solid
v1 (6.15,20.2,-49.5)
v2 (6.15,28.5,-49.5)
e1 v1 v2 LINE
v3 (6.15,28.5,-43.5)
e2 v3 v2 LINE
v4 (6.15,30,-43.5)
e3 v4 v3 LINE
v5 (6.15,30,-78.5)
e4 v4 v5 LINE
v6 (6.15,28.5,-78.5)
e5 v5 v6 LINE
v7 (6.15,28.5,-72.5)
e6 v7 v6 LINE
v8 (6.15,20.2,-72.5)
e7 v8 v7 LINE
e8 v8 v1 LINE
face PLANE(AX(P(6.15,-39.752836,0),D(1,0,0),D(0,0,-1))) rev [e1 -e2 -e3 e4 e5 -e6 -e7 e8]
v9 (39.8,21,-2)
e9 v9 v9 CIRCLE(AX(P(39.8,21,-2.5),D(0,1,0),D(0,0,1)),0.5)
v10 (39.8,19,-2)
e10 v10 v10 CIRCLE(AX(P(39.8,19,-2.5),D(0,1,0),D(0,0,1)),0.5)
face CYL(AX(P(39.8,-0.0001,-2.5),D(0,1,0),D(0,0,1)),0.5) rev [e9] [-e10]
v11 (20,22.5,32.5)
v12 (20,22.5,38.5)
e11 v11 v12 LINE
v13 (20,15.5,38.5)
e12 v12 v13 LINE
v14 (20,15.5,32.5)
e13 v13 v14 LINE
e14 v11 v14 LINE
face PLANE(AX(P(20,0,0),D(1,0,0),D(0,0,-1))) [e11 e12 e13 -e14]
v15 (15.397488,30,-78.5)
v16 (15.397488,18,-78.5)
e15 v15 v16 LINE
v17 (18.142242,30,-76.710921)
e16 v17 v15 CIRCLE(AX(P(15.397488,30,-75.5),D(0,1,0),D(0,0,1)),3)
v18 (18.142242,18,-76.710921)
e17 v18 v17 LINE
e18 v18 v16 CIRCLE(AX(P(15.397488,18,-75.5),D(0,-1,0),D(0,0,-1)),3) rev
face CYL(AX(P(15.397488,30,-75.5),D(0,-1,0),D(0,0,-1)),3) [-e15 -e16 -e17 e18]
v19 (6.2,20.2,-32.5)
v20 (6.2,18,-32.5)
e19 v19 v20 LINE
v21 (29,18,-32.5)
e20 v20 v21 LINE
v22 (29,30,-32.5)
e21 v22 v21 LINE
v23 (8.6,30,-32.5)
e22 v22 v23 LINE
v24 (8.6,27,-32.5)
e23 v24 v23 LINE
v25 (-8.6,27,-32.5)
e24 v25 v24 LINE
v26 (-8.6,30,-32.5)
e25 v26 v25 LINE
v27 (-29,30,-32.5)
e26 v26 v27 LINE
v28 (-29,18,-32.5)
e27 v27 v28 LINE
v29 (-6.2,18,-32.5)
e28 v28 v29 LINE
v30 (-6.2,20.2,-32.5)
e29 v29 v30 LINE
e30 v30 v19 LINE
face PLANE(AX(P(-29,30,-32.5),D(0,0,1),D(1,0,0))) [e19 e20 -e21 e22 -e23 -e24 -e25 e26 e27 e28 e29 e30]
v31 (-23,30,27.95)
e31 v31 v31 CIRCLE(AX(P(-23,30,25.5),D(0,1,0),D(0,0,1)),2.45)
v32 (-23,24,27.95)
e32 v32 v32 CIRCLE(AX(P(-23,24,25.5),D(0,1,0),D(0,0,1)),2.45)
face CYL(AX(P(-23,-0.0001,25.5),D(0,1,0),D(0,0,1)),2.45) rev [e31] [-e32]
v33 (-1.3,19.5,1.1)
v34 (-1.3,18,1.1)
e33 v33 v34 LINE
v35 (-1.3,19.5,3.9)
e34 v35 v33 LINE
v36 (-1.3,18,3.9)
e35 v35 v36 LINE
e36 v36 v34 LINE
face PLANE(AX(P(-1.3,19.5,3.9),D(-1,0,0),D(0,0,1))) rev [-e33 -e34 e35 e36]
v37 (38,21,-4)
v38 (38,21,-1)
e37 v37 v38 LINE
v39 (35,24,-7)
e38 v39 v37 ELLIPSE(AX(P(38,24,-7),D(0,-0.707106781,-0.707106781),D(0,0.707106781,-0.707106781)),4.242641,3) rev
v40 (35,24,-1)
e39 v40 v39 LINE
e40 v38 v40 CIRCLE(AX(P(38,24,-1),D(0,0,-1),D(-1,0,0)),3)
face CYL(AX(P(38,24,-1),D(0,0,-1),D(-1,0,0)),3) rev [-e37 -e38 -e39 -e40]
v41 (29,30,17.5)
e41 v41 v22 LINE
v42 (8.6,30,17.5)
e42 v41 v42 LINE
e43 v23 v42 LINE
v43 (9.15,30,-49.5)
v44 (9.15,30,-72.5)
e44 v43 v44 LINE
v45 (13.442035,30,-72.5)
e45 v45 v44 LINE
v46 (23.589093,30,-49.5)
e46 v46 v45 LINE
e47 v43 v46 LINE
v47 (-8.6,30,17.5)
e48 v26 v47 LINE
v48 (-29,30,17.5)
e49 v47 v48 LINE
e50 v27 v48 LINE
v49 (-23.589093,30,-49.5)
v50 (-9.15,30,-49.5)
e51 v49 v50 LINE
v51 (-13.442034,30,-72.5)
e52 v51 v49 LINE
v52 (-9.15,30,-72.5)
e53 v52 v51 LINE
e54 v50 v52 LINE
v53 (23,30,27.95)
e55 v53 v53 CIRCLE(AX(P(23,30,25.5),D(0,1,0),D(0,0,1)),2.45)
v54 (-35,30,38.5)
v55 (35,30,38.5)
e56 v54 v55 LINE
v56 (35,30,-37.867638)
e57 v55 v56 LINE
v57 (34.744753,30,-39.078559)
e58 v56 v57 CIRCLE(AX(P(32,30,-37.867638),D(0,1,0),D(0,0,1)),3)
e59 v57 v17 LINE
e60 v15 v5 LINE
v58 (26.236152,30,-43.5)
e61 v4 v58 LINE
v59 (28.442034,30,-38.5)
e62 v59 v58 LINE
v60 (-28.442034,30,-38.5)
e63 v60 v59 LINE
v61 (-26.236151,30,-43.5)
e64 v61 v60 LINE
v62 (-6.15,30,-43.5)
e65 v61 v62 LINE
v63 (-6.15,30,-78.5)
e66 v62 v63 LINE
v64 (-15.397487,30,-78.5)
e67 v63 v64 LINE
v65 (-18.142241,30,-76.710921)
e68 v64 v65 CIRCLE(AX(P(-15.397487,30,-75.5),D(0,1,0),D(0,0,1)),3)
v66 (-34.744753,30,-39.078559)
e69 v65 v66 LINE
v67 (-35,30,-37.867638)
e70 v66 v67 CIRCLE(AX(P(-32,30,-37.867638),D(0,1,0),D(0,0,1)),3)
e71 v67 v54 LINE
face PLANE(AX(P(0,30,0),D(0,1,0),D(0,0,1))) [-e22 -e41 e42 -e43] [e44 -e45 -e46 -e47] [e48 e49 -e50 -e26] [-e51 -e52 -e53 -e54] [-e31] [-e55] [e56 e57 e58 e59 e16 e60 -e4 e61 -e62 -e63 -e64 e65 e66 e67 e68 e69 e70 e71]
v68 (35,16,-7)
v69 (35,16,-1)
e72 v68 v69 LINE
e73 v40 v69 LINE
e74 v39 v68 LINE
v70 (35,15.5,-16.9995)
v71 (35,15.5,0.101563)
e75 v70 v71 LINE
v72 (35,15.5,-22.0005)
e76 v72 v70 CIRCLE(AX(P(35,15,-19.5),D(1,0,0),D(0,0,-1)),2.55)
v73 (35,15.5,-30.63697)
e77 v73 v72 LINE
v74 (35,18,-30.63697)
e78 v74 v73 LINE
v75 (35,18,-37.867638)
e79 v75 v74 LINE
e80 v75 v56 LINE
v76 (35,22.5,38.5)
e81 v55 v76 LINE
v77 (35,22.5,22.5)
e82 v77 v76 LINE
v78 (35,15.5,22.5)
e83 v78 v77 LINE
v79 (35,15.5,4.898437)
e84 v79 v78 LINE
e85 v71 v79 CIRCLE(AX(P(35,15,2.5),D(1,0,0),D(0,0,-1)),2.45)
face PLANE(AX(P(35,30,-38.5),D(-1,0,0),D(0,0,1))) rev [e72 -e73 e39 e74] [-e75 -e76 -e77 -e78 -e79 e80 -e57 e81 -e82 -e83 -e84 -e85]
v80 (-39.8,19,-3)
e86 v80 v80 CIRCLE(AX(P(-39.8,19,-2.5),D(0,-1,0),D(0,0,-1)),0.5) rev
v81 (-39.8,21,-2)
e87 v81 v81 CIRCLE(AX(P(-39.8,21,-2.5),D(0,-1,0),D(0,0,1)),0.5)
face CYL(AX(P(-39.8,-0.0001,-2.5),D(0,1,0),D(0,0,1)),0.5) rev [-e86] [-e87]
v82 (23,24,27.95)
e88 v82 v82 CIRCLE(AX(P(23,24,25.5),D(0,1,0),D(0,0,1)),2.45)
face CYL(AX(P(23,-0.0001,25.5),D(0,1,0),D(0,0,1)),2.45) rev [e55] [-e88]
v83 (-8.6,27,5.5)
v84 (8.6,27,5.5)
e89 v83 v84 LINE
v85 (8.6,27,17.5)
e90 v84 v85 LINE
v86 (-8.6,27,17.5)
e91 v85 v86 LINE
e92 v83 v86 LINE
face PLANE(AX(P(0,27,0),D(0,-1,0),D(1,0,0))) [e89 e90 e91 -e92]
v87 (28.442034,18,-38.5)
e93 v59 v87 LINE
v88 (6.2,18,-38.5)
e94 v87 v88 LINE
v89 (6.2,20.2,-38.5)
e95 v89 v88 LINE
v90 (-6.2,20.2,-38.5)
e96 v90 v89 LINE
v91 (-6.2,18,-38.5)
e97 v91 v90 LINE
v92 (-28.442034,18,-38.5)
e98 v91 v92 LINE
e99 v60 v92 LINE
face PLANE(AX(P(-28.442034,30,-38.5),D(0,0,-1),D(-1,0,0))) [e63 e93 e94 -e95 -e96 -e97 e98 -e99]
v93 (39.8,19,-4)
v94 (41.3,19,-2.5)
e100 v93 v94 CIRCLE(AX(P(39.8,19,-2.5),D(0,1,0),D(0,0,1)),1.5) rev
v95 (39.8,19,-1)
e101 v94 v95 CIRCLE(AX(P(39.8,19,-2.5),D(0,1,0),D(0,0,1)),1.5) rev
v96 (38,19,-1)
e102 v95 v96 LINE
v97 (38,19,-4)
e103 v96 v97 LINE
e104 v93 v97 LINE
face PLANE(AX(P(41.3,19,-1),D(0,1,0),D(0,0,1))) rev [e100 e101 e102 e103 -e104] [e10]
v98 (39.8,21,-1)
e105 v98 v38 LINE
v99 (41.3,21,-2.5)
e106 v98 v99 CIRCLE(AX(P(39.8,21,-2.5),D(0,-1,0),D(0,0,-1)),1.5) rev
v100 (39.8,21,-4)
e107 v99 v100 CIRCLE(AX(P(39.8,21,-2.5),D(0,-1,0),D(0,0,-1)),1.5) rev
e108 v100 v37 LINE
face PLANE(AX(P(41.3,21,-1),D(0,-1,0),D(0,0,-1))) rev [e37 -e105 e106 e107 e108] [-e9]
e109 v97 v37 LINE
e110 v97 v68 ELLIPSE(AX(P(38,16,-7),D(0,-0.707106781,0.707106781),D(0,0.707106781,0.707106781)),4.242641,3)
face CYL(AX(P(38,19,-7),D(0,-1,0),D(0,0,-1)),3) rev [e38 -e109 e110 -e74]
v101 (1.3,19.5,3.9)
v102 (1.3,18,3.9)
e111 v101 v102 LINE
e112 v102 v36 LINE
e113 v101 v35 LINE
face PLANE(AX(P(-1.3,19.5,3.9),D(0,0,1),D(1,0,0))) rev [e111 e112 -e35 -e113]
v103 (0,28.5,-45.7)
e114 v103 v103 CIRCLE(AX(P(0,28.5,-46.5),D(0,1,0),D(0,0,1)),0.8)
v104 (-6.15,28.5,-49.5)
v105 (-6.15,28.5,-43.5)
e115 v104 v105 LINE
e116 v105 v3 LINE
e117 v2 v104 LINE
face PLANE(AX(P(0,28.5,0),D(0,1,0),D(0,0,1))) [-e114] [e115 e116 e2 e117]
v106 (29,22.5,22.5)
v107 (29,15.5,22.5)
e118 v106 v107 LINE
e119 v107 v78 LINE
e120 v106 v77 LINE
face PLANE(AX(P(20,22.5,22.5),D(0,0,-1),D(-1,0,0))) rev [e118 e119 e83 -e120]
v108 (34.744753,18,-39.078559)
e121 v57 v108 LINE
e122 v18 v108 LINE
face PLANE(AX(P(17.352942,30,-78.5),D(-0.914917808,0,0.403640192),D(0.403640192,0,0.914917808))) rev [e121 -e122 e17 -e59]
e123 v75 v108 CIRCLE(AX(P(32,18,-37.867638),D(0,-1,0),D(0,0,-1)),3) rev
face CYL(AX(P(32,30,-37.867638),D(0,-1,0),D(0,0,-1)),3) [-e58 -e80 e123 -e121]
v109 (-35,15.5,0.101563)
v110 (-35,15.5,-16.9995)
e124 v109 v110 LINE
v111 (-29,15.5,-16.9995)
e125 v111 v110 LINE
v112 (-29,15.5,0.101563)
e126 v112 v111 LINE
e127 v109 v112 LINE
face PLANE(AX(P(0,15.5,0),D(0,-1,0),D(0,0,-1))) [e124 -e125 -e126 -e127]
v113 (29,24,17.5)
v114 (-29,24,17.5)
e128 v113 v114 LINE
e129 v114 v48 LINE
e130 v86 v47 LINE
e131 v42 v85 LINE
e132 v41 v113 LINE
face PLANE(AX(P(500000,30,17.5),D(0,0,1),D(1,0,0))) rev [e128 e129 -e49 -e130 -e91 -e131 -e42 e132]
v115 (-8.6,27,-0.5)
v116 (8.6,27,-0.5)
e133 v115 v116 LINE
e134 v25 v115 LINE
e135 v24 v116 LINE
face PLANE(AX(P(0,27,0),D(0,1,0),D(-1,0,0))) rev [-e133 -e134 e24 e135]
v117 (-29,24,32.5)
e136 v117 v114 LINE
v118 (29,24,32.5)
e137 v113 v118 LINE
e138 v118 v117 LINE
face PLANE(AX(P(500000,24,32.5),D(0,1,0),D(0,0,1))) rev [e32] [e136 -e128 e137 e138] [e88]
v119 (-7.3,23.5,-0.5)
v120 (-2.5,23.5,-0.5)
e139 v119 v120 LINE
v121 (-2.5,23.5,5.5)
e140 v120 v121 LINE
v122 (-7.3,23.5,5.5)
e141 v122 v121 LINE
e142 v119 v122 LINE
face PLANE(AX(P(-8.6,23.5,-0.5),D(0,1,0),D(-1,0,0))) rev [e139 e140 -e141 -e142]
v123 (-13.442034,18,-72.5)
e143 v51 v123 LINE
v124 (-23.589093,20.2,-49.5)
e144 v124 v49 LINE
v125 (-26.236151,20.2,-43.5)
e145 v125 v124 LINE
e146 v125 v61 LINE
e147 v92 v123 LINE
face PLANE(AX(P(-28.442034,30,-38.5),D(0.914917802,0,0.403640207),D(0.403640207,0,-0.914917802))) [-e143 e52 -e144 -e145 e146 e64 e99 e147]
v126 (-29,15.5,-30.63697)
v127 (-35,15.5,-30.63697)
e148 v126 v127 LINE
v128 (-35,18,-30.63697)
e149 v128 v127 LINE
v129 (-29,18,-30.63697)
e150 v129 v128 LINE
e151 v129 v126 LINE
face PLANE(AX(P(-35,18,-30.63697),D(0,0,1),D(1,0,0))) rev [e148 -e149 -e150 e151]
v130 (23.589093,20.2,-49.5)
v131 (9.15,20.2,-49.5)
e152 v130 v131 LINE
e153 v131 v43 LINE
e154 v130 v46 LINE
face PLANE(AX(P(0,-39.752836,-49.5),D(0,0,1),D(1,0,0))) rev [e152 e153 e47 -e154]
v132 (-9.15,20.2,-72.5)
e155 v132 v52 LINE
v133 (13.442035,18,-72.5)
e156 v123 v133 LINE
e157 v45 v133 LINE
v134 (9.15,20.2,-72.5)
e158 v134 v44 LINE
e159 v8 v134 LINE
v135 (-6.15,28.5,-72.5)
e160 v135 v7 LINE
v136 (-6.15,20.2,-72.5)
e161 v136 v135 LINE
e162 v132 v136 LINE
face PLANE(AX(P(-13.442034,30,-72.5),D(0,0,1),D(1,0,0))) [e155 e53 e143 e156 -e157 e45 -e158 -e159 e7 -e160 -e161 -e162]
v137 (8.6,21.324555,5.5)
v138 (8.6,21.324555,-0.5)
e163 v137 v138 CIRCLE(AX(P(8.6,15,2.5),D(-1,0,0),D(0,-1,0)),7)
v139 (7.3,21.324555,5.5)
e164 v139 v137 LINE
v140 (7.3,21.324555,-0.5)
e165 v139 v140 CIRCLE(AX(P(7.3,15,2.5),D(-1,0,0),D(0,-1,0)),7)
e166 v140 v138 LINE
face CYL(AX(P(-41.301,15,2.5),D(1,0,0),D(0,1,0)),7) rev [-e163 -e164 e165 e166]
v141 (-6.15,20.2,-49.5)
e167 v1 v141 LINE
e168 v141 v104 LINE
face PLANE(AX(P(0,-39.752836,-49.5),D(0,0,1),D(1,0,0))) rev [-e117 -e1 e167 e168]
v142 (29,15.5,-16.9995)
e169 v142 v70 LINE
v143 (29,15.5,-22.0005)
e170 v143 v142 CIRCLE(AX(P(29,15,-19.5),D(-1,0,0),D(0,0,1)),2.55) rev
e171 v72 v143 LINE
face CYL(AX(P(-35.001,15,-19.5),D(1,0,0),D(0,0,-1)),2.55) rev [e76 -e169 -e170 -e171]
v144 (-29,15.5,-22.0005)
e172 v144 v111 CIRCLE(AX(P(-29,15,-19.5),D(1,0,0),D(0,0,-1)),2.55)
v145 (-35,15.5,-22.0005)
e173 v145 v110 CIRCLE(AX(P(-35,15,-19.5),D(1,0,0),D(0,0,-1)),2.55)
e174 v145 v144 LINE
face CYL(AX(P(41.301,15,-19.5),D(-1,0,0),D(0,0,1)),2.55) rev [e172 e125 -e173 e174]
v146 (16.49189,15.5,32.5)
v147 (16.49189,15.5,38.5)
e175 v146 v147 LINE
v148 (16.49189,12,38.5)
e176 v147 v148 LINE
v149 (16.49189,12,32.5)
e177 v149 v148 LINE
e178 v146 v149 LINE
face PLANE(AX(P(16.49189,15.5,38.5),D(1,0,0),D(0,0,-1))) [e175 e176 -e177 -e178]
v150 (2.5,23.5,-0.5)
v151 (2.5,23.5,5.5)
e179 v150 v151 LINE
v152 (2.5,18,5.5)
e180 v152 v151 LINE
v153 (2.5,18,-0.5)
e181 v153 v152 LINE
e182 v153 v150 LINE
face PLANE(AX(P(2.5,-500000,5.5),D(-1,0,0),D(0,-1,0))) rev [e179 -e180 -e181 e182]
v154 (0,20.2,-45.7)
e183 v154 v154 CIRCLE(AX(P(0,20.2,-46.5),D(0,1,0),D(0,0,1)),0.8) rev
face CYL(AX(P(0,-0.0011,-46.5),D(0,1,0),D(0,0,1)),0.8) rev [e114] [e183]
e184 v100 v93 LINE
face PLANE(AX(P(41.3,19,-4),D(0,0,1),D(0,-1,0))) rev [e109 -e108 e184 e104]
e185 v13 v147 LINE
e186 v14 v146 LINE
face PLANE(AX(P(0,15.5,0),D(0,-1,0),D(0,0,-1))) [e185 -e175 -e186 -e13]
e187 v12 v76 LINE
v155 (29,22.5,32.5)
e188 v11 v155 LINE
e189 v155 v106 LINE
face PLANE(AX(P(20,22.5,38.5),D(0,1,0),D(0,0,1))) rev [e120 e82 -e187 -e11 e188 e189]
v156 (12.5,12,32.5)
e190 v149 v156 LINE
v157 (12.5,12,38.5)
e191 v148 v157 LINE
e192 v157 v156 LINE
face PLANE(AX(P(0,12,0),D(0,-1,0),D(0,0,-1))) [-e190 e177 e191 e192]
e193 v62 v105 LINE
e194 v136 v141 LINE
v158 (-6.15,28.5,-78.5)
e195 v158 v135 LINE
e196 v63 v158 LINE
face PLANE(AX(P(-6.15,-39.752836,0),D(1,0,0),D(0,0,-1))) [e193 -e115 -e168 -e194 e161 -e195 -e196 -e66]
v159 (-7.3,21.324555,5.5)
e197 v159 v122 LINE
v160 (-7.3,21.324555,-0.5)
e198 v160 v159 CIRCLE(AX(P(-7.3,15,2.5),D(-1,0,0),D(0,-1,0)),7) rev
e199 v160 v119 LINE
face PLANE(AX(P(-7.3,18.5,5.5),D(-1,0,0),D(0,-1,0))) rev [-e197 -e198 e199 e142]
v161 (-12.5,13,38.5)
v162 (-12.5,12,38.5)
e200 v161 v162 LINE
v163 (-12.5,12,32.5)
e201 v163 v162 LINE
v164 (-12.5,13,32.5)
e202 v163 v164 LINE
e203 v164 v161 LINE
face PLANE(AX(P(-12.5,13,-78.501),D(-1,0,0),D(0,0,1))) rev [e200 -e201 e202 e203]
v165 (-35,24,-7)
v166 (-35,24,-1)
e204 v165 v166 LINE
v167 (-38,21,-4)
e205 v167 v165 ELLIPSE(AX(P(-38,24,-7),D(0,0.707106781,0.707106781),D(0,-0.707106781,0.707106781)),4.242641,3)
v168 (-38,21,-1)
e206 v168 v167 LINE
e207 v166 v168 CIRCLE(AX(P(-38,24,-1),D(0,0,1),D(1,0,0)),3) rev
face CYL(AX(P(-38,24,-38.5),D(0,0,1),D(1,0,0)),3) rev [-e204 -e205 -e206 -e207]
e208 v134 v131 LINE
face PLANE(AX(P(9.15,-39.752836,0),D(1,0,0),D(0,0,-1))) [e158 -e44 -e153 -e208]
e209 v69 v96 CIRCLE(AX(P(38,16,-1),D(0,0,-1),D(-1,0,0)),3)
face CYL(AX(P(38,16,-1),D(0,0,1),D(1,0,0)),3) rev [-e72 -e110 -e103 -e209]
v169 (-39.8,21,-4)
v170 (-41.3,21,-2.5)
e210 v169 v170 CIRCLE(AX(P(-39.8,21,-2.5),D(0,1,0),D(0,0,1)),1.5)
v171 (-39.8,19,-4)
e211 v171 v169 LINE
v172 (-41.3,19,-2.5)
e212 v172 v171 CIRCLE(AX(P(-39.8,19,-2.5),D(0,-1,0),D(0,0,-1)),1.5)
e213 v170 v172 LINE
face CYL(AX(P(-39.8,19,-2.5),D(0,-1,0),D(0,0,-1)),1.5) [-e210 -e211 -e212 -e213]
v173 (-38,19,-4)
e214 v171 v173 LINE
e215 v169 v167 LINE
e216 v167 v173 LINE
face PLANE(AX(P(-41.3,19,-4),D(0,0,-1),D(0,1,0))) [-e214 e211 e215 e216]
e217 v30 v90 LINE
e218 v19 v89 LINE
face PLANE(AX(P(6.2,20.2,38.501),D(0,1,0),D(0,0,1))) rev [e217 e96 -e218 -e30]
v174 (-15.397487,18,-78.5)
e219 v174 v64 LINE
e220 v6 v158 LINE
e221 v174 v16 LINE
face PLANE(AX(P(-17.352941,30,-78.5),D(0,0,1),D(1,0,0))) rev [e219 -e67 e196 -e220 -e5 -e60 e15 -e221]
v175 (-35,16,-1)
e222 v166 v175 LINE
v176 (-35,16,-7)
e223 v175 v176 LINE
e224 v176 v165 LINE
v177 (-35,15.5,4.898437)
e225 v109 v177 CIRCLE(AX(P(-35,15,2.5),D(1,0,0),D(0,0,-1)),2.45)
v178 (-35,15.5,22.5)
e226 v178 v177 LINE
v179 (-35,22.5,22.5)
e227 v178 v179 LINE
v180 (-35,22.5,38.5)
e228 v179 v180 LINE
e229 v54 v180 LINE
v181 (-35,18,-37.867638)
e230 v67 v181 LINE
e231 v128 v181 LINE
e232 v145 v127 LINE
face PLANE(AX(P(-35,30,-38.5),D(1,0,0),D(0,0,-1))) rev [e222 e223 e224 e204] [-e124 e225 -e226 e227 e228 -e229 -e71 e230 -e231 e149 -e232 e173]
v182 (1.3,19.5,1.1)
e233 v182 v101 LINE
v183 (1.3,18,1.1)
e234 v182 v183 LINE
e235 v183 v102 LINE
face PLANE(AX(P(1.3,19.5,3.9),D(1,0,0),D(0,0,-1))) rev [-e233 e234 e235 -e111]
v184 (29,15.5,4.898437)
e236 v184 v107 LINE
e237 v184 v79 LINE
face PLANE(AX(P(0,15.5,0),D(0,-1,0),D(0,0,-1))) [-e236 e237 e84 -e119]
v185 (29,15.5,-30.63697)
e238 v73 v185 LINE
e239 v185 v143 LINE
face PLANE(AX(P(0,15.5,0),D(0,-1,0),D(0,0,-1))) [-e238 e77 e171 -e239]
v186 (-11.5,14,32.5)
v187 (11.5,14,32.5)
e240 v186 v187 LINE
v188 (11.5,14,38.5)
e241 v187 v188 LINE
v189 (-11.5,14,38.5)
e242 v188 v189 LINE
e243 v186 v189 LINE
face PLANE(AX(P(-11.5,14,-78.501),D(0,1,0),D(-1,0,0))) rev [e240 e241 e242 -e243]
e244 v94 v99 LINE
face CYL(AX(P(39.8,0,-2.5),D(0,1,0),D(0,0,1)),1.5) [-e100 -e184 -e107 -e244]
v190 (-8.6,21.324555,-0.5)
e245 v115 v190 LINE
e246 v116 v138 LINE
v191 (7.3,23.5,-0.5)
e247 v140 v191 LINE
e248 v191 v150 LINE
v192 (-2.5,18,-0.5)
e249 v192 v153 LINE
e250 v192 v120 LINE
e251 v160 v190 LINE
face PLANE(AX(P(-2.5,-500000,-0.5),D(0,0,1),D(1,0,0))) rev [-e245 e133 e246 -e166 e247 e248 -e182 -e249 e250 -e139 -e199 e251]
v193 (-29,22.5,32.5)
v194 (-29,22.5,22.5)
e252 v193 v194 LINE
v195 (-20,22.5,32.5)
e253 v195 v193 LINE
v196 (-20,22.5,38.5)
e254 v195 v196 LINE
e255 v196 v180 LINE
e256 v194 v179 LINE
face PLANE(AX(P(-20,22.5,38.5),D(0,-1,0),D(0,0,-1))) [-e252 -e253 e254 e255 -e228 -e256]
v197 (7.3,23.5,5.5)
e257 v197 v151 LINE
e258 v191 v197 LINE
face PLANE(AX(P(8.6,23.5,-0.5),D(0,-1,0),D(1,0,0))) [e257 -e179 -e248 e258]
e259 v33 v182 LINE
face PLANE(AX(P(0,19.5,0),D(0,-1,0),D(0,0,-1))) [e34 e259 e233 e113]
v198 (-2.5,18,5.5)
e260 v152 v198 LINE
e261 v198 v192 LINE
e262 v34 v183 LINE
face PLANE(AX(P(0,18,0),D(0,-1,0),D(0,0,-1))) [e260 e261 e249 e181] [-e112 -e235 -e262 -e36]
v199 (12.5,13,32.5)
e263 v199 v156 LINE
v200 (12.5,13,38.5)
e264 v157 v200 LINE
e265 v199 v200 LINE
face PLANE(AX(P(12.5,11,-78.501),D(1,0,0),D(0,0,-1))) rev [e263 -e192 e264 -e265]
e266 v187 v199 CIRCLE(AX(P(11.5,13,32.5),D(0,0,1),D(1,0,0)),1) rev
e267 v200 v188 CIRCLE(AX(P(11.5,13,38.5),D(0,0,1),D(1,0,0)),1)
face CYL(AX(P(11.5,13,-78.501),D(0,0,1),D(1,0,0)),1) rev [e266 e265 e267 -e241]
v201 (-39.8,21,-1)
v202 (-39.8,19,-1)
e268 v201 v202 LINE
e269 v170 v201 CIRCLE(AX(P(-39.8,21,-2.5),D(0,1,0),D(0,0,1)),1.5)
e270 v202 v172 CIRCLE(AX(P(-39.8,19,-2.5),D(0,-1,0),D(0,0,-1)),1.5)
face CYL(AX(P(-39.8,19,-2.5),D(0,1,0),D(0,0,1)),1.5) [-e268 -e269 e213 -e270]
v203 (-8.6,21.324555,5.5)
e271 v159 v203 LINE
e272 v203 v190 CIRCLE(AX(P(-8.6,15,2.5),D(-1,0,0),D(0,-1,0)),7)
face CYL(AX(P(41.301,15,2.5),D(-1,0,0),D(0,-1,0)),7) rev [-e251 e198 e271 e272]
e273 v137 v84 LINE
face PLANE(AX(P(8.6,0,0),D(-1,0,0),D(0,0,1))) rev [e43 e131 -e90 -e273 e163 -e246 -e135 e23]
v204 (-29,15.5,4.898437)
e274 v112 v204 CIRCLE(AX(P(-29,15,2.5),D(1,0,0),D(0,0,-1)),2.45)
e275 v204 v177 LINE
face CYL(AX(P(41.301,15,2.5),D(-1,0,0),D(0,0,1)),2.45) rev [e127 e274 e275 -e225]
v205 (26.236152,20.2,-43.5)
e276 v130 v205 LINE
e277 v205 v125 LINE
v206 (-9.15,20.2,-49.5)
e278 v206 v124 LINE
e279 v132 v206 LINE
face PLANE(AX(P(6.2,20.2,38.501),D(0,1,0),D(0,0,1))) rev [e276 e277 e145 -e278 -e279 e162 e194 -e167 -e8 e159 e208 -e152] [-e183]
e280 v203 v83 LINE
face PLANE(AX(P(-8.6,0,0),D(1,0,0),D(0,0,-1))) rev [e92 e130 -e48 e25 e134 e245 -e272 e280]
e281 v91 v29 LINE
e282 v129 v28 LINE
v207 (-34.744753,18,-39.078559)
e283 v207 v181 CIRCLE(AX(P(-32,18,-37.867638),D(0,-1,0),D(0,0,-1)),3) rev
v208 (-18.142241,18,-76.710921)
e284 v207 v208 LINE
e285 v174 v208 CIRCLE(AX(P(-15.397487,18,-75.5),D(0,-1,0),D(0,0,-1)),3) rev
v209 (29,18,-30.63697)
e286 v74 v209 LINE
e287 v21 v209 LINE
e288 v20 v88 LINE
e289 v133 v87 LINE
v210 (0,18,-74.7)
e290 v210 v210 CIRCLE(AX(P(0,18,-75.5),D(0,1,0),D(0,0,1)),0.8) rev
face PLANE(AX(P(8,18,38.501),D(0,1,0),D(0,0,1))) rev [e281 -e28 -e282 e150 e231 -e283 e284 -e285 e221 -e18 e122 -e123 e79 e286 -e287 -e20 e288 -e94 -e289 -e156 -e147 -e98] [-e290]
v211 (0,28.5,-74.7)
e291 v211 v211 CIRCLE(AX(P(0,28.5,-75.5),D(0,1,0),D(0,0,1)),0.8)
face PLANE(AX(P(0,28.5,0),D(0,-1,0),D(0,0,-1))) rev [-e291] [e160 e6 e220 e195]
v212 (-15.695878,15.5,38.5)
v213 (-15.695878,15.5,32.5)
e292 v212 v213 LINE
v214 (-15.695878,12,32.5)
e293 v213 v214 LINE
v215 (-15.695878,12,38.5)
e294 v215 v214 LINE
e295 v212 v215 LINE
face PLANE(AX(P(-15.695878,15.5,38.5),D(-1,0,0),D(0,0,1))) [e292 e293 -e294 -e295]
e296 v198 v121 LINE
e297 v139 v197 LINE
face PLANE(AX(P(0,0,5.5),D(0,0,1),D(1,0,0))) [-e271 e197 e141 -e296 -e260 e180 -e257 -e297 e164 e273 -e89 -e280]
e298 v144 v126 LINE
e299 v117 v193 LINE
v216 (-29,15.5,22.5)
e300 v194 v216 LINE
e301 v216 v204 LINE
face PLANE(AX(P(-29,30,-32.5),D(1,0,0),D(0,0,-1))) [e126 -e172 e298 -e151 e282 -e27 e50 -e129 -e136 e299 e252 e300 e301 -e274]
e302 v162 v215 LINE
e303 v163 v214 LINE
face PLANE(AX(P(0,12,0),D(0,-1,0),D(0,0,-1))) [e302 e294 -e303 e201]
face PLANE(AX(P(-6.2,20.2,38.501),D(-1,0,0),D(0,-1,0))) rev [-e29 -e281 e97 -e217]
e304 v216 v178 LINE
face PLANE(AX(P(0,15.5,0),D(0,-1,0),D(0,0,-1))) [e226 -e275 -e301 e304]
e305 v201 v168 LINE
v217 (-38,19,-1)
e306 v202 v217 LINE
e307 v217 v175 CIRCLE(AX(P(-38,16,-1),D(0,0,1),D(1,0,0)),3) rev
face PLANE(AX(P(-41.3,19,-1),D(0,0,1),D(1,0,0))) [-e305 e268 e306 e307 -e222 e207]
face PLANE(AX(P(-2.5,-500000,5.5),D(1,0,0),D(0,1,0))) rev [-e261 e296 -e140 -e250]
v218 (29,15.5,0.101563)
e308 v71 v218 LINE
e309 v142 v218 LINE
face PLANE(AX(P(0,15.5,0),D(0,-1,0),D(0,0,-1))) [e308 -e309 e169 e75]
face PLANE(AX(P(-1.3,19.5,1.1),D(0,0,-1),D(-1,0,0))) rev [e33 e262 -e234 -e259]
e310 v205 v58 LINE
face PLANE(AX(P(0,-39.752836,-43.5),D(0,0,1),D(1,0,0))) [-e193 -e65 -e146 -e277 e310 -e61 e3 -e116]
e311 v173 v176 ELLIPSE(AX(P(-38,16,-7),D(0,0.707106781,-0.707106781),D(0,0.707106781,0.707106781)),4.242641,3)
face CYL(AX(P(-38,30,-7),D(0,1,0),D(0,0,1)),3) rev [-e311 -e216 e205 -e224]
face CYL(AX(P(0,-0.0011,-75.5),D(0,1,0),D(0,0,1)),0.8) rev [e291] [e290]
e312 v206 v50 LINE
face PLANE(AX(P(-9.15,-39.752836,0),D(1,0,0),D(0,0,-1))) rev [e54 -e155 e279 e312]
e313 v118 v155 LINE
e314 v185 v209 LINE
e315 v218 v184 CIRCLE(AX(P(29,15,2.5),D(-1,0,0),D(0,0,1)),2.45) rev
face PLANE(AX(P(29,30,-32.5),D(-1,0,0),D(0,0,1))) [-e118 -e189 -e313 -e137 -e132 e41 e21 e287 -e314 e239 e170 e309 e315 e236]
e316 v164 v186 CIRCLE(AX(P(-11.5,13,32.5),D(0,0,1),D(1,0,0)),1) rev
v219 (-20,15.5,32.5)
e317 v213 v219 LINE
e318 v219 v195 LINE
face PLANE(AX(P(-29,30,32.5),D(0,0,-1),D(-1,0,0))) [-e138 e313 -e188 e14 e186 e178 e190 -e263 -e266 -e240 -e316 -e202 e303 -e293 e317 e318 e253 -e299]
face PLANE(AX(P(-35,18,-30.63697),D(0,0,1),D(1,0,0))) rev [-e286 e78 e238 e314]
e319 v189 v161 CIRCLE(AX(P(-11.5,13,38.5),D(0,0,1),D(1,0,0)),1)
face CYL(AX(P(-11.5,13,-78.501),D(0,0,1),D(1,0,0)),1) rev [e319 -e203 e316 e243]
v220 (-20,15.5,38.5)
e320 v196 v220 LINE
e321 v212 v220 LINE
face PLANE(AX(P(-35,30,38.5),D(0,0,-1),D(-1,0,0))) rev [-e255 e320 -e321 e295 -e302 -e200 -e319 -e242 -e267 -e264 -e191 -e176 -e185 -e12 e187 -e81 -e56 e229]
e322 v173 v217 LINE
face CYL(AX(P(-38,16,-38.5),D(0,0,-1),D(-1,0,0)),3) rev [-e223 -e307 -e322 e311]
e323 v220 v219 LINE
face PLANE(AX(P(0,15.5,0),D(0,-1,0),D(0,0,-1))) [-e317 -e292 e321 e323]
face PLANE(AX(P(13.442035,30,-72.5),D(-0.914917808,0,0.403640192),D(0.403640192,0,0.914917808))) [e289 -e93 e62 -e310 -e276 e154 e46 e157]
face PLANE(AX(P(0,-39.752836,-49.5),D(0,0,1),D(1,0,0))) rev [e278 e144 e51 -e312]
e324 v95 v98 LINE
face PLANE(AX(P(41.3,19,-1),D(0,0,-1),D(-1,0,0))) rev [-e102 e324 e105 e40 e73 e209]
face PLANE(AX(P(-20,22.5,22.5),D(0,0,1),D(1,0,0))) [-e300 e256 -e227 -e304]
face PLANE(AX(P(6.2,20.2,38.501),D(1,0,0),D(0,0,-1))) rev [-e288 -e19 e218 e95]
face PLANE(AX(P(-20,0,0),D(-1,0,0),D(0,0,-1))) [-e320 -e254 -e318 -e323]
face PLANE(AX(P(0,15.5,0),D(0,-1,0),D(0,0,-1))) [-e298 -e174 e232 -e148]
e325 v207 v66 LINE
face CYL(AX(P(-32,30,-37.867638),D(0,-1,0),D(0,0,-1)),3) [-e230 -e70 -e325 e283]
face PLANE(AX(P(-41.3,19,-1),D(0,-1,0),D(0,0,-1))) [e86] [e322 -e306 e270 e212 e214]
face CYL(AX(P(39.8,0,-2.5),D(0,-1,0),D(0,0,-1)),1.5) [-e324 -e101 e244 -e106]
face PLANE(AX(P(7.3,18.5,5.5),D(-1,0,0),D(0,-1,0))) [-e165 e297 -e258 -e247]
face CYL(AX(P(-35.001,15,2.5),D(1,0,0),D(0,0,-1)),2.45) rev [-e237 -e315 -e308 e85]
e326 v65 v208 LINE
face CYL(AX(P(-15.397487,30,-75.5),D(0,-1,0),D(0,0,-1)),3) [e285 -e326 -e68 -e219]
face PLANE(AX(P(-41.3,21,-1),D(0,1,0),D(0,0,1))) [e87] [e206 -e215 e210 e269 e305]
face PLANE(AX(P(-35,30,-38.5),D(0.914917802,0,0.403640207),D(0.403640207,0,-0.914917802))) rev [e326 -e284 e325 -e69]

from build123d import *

# Parameters (mm, degrees)
SKETCH1_W               = 58
SKETCH1_H               = 65
BOSS_EXTRUDE1_DEPTH     = 30
BOSS_EXTRUDE3_REACH     = 92.09
SKETCH10_W              = 5
SKETCH10_H              = 6
CUT_EXTRUDE1_REACH      = 111.372
SKETCH2_R               = 2.45
SKETCH2_R_2             = 2.55
CUT_EXTRUDE2_REACH      = 91.744
SKETCH3_W               = 12.4
SKETCH3_H               = 10.4
SKETCH11_W              = 3
SKETCH11_H              = 2
BOSS_EXTRUDE4_DEPTH     = 6.3
FILLET3_R               = 1.5
SKETCH12_R              = 0.5
CUT_EXTRUDE3_DEPTH      = 92.15338732
FILLET3_OF_MIRROR1_R    = 1.5
BOSS_EXTRUDE5_REACH     = 111.564
SKETCH13_W              = 15
SKETCH13_H              = 6
BOSS_EXTRUDE6_REACH     = 111.564
SKETCH17_W              = 15
SKETCH17_H              = 14
SKETCH14_R              = 2.45
CUT_EXTRUDE4_DEPTH      = 94.637279017
SKETCH16_W              = 16
SKETCH16_H              = 7
CUT_EXTRUDE7_DEPTH      = 15
CUT_EXTRUDE8_REACH      = 129.651
CUT_EXTRUDE9_START      = -6
SKETCH19_W              = 30
SKETCH19_H              = 15
CUT_EXTRUDE9_DEPTH      = 18
CUT_EXTRUDE18_REACH     = 129.651
SKETCH35_W              = 16
SKETCH35_H              = 6
FILLET5_R               = 3
BOSS_EXTRUDE7_START     = 20.2
BOSS_EXTRUDE7_DEPTH     = 9.8
CUT_EXTRUDE12_REACH     = 109.009
CUT_EXTRUDE12_START     = 16.5
SKETCH23_W              = 12.3
SKETCH23_H              = 6
BOSS_EXTRUDE8_DEPTH     = 20
CUT_EXTRUDE15_REACH     = 95.168
SKETCH28_R              = 0.8
FILLET4_R               = 3
CUT_EXTRUDE16_REACH     = 96.767
SKETCH29_R              = 1.6
SKETCH30_W              = 6
SKETCH30_H              = 3.5
BOSS_EXTRUDE9_DEPTH     = 6.1
SKETCH31_W              = 1.3
SKETCH31_H              = 6
BOSS_EXTRUDE10_DEPTH    = 5
CUT_EXTRUDE17_REACH     = 99.736
MIRROR5_COPY_1_SKETCH_W = 6
MIRROR5_COPY_1_SKETCH_H = 3.5
MIRROR5_COPY_1_DEPTH    = 6.1
MIRROR5_COPY_2_SKETCH_W = 1.3
MIRROR5_COPY_2_SKETCH_H = 6
MIRROR5_COPY_2_DEPTH    = 5
MIRROR5_COPY_3_REACH    = 99.736
SKETCH36_W              = 117.647989829
SKETCH36_H              = 130.366691432
CUT_EXTRUDE19_DEPTH     = 12
SKETCH37_W              = 122.41750293
SKETCH37_H              = 135.772139613
SKETCH37_W_2            = 32.18776844
SKETCH37_H_2            = 6
CUT_EXTRUDE20_DEPTH     = 3.5
SKETCH38_W              = 70
SKETCH38_H              = 47.863029623
SKETCH38_W_2            = 5
SKETCH38_H_2            = 6
CUT_EXTRUDE21_DEPTH     = 2.5
SKETCH39_W              = 2.6
SKETCH39_H              = 2.8
CUT_EXTRUDE22_DEPTH     = 1.5


with BuildPart() as part:
    # Sketch1 → Boss-Extrude1 (new body)
    with BuildSketch(Plane(origin=(0, 0, 0), x_dir=(1, 0, 0), z_dir=(0, 1, 0))):
        Polygon((-35, 38.5), (-17.352941176, 78.5), (17.352941947, 78.5), (35, 38.5), (35, -38.5), (-35, -38.5), align=None)
        Rectangle(SKETCH1_W, SKETCH1_H, mode=Mode.SUBTRACT)
        Polygon((-28.44203382, 38.5), (28.442033867, 38.5), (13.442034522, 72.5), (-13.44203382, 72.5), align=None, mode=Mode.SUBTRACT)
    extrude(amount=BOSS_EXTRUDE1_DEPTH)

    # Sketch7 → Loft3 section 0
    with BuildSketch(Plane.XY.offset(-32.5)):
        with BuildLine():
            Line((-8.6, 30), (8.6, 30))
            Line((8.6, 30), (8.6, 27))
            Line((8.6, 27), (-8.6, 27))
            Line((-8.6, 27), (-8.6, 30))
        make_face()
    # Sketch8 → Loft3 section 1
    with BuildSketch(Plane.XY.offset(5.5)):
        with BuildLine():
            Line((-8.6, 30), (8.6, 30))
            Line((8.6, 30), (8.6, 27))
            Line((8.6, 27), (-8.6, 27))
            Line((-8.6, 27), (-8.6, 30))
        make_face()
    loft3 = loft()

    # Mirror3: Loft3 across plane
    add(loft3.mirror(Plane(origin=(0, 15, 0), x_dir=(0, 0, 1), z_dir=(0, -1, 0))))

    # Sketch10 → Boss-Extrude3 (add, up to next)
    with BuildSketch(Plane.XZ.offset(-27), mode=Mode.PRIVATE) as boss_extrude3_sk1:
        with Locations((0, 2.5)):
            Rectangle(SKETCH10_W, SKETCH10_H)
    boss_extrude3_tool1 = extrude(boss_extrude3_sk1.sketch, amount=BOSS_EXTRUDE3_REACH, mode=Mode.PRIVATE) - part.part
    add(boss_extrude3_tool1.solids().sort_by_distance((0, 27, 2.5))[0])

    # Sketch2 → Cut-Extrude1 (cut, up to next)
    with BuildSketch(Plane(origin=(35, 0, 0), x_dir=(0, 0, -1), z_dir=(1, 0, 0)), mode=Mode.PRIVATE) as cut_extrude1_sk1:
        with Locations((-2.5, 15)):
            Circle(SKETCH2_R)
    cut_extrude1_tool1 = extrude(cut_extrude1_sk1.sketch, amount=-CUT_EXTRUDE1_REACH, mode=Mode.PRIVATE) & part.part
    # Sketch2 → Cut-Extrude1 (cut, up to next)
    with BuildSketch(Plane(origin=(35, 0, 0), x_dir=(0, 0, -1), z_dir=(1, 0, 0)), mode=Mode.PRIVATE) as cut_extrude1_sk2:
        with Locations((19.5, 15)):
            Circle(SKETCH2_R_2)
    cut_extrude1_tool2 = extrude(cut_extrude1_sk2.sketch, amount=-CUT_EXTRUDE1_REACH, mode=Mode.PRIVATE) & part.part
    cut_extrude1_1 = cut_extrude1_tool1.solids().sort_by_distance((35, 15, 2.5))[0]
    add(cut_extrude1_1, mode=Mode.SUBTRACT)
    cut_extrude1_2 = cut_extrude1_tool2.solids().sort_by_distance((35, 15, -19.5))[0]
    add(cut_extrude1_2, mode=Mode.SUBTRACT)
    cut_extrude1 = cut_extrude1_1 + cut_extrude1_2  # Cut-Extrude1 as one shape, for the pattern or mirror that repeats it

    # Sketch3 → Cut-Extrude2 (cut, up to next)
    with BuildSketch(Plane(origin=(0, 0, -38.5), x_dir=(-1, 0, 0), z_dir=(0, 0, -1)), mode=Mode.PRIVATE) as cut_extrude2_sk1:
        with Locations((0, 15)):
            Rectangle(SKETCH3_W, SKETCH3_H)
    cut_extrude2_tool1 = extrude(cut_extrude2_sk1.sketch, amount=-CUT_EXTRUDE2_REACH, mode=Mode.PRIVATE) & part.part
    add(cut_extrude2_tool1.solids().sort_by_distance((0, 15, -38.5))[0], mode=Mode.SUBTRACT)

    # Sketch11 → Boss-Extrude4 (add)
    with BuildSketch(Plane(origin=(35, 0, 0), x_dir=(0, 0, -1), z_dir=(1, 0, 0))):
        with Locations((2.5, 20)):
            Rectangle(SKETCH11_W, SKETCH11_H)
        with Locations((2.5, 10)):
            Rectangle(SKETCH11_W, SKETCH11_H)
    boss_extrude4 = extrude(amount=BOSS_EXTRUDE4_DEPTH)

    # Fillet3
    fillet3_edges = [part.edges().sort_by_distance(p)[0] for p in [
        (41.3, 10, -1),
        (41.3, 10, -4),
        (41.3, 20, -1),
        (41.3, 20, -4),
    ]]
    fillet(fillet3_edges, radius=FILLET3_R - 0.0001)  # a hair under: the kernel refuses the full size

    # Sketch12 → Cut-Extrude3 (cut, through all)
    with BuildSketch(Plane(origin=(0, 21, 0), x_dir=(1, 0, 0), z_dir=(0, 1, 0))):
        with Locations(Location((39.8, 2.5, 0), (0, 0, 270))):
            Circle(SKETCH12_R)
    cut_extrude3 = extrude(amount=-CUT_EXTRUDE3_DEPTH, mode=Mode.SUBTRACT)

    # Mirror1: Cut-Extrude1, Boss-Extrude4, Cut-Extrude3 across plane
    add(cut_extrude1.mirror(Plane(origin=(0, 0, 0), x_dir=(0, 0, 1), z_dir=(1, 0, 0))), mode=Mode.SUBTRACT)
    add(boss_extrude4.mirror(Plane(origin=(0, 0, 0), x_dir=(0, 0, 1), z_dir=(1, 0, 0))))
    add(cut_extrude3.mirror(Plane(origin=(0, 0, 0), x_dir=(0, 0, 1), z_dir=(1, 0, 0))), mode=Mode.SUBTRACT)

    # Fillet3 of Mirror1
    fillet3_of_mirror1_edges = [part.edges().sort_by_distance(p)[0] for p in [
        (-41.3, 10, -1),
        (-41.3, 10, -4),
        (-41.3, 20, -1),
        (-41.3, 20, -4),
    ]]
    fillet(fillet3_of_mirror1_edges, radius=FILLET3_OF_MIRROR1_R - 0.0001)  # a hair under: the kernel refuses the full size

    # Sketch13 → Boss-Extrude5 (add, up to next)
    with BuildSketch(Plane(origin=(-29, 0, 0), x_dir=(0, 0, -1), z_dir=(1, 0, 0)), mode=Mode.PRIVATE) as boss_extrude5_sk1:
        with Locations((-25, 27)):
            Rectangle(SKETCH13_W, SKETCH13_H)
    boss_extrude5_tool1 = extrude(boss_extrude5_sk1.sketch, amount=BOSS_EXTRUDE5_REACH, mode=Mode.PRIVATE) - part.part
    add(boss_extrude5_tool1.solids().sort_by_distance((-29, 27, 25))[0])

    # Sketch17 → Boss-Extrude6 (add, up to next)
    with BuildSketch(Plane(origin=(-29, 0, 0), x_dir=(0, 0, -1), z_dir=(1, 0, 0)), mode=Mode.PRIVATE) as boss_extrude6_sk1:
        with Locations((-25, 7)):
            Rectangle(SKETCH17_W, SKETCH17_H)
    boss_extrude6_tool1 = extrude(boss_extrude6_sk1.sketch, amount=BOSS_EXTRUDE6_REACH, mode=Mode.PRIVATE) - part.part
    add(boss_extrude6_tool1.solids().sort_by_distance((-29, 7, 25))[0])

    # Sketch14 → Cut-Extrude4 (cut, through all)
    with BuildSketch(Plane(origin=(0, 30, 0), x_dir=(1, 0, 0), z_dir=(0, 1, 0))):
        with Locations(Location((-23, -25.5, 0), (0, 0, 270))):
            Circle(SKETCH14_R)
        with Locations(Location((23, -25.5, 0), (0, 0, 270))):
            Circle(SKETCH14_R)
    extrude(amount=-CUT_EXTRUDE4_DEPTH, mode=Mode.SUBTRACT)

    # Sketch16 → Cut-Extrude7 (cut)
    with BuildSketch(Plane(origin=(35, 0, 0), x_dir=(0, 0, -1), z_dir=(1, 0, 0))):
        with Locations((-30.5, 19)):
            Rectangle(SKETCH16_W, SKETCH16_H)
    cut_extrude7 = extrude(amount=-CUT_EXTRUDE7_DEPTH, mode=Mode.SUBTRACT)

    # Mirror2: Cut-Extrude7 across plane
    add(cut_extrude7.mirror(Plane(origin=(0, 0, 0), x_dir=(0, 0, 1), z_dir=(1, 0, 0))), mode=Mode.SUBTRACT)

    # Sketch18 → Cut-Extrude8 (cut, up to next)
    with BuildSketch(Plane.XY.offset(38.5), mode=Mode.PRIVATE) as cut_extrude8_sk1:
        with BuildLine():
            Line((-11.5, 14), (11.5, 14))
            ThreePointArc((11.5, 14), (12.207106781, 13.707106781), (12.5, 13))
            Line((12.5, 13), (12.5, 11))
            ThreePointArc((12.5, 11), (12.207106781, 10.292893219), (11.5, 10))
            Line((11.5, 10), (-11.5, 10))
            ThreePointArc((-11.5, 10), (-12.207106781, 10.292893219), (-12.5, 11))
            Line((-12.5, 11), (-12.5, 13))
            ThreePointArc((-12.5, 13), (-12.207106781, 13.707106781), (-11.5, 14))
        make_face()
    cut_extrude8_tool1 = extrude(cut_extrude8_sk1.sketch, amount=-CUT_EXTRUDE8_REACH, mode=Mode.PRIVATE) & part.part
    add(cut_extrude8_tool1.solids().sort_by_distance((0, 12, 38.5))[0], mode=Mode.SUBTRACT)

    # Sketch19 → Cut-Extrude9 (cut)
    with BuildSketch(Plane(origin=(0, 30, 0), x_dir=(1, 0, 0), z_dir=(0, 1, 0)).offset(CUT_EXTRUDE9_START)):
        with Locations((0, -25)):
            Rectangle(SKETCH19_W, SKETCH19_H)
    extrude(amount=-CUT_EXTRUDE9_DEPTH, mode=Mode.SUBTRACT)

    # Sketch35 → Cut-Extrude18 (cut, up to next)
    with BuildSketch(Plane(origin=(0, 0, -78.5), x_dir=(-1, 0, 0), z_dir=(0, 0, -1)), mode=Mode.PRIVATE) as cut_extrude18_sk1:
        with Locations((0, 15)):
            Rectangle(SKETCH35_W, SKETCH35_H)
    cut_extrude18_tool1 = extrude(cut_extrude18_sk1.sketch, amount=-CUT_EXTRUDE18_REACH, mode=Mode.PRIVATE) & part.part
    add(cut_extrude18_tool1.solids().sort_by_distance((0, 15, -78.5))[0], mode=Mode.SUBTRACT)

    # Fillet5
    fillet5_edges = [part.edges().sort_by_distance(p)[0] for p in [
        (-35, 15, -38.5),
        (-17.352941176, 15, -78.5),
        (17.352941947, 15, -78.5),
        (35, 15, -38.5),
        (-8, 15, -78.5),
        (8, 15, -78.5),
    ]]
    fillet(fillet5_edges, radius=FILLET5_R)

    # Sketch24 → Boss-Extrude7 (add)
    with BuildSketch(Plane(origin=(0, 0, 0), x_dir=(1, 0, 0), z_dir=(0, 1, 0)).offset(BOSS_EXTRUDE7_START)):
        Polygon((9.15, 49.5), (9.15, 72.5), (6.15, 72.5), (6.15, 49.5), (-6.15, 49.5), (-6.15, 72.5), (-9.15, 72.5), (-9.15, 49.5), (-23.589092644, 49.5), (-26.23615161, 43.5), (26.23615161, 43.5), (23.589092902, 49.5), align=None)
    extrude(amount=BOSS_EXTRUDE7_DEPTH)

    # Sketch23 → Cut-Extrude12 (cut, up to next)
    with BuildSketch(Plane(origin=(0, 12, 0), x_dir=(1, 0, 0), z_dir=(0, 1, 0)).offset(CUT_EXTRUDE12_START), mode=Mode.PRIVATE) as cut_extrude12_sk1:
        with Locations((0, 75.5)):
            Rectangle(SKETCH23_W, SKETCH23_H)
    cut_extrude12_tool1 = extrude(cut_extrude12_sk1.sketch, amount=CUT_EXTRUDE12_REACH, mode=Mode.PRIVATE) & part.part
    # Sketch23 → Cut-Extrude12 (cut, up to next)
    with BuildSketch(Plane(origin=(0, 12, 0), x_dir=(1, 0, 0), z_dir=(0, 1, 0)).offset(CUT_EXTRUDE12_START), mode=Mode.PRIVATE) as cut_extrude12_sk2:
        with Locations((0, 46.5)):
            Rectangle(SKETCH23_W, SKETCH23_H)
    cut_extrude12_tool2 = extrude(cut_extrude12_sk2.sketch, amount=CUT_EXTRUDE12_REACH, mode=Mode.PRIVATE) & part.part
    add(cut_extrude12_tool1.solids().sort_by_distance((0, 28.5, -75.5))[0], mode=Mode.SUBTRACT)
    add(cut_extrude12_tool2.solids().sort_by_distance((0, 28.5, -46.5))[0], mode=Mode.SUBTRACT)

    # Sketch26 → Boss-Extrude8 (add)
    with BuildSketch(Plane(origin=(0, 0, -38.5), x_dir=(-1, 0, 0), z_dir=(0, 0, -1))):
        Polygon((-6.2, 9.8), (6.2, 9.8), (6.2, 12), (11.2, 12), (11.2, 4.8), (-11.2, 4.8), (-11.2, 12), (-6.2, 12), align=None)
    extrude(amount=BOSS_EXTRUDE8_DEPTH)

    # Sketch28 → Cut-Extrude15 (cut, up to next)
    with BuildSketch(Plane(origin=(0, 28.5, 0), x_dir=(-1, 0, 0), z_dir=(0, 1, 0)), mode=Mode.PRIVATE) as cut_extrude15_sk1:
        with Locations(Location((0, -46.5, 0), (0, 0, 90))):
            Circle(SKETCH28_R)
    cut_extrude15_tool1 = extrude(cut_extrude15_sk1.sketch, amount=-CUT_EXTRUDE15_REACH, mode=Mode.PRIVATE) & part.part
    # Sketch28 → Cut-Extrude15 (cut, up to next)
    with BuildSketch(Plane(origin=(0, 28.5, 0), x_dir=(-1, 0, 0), z_dir=(0, 1, 0)), mode=Mode.PRIVATE) as cut_extrude15_sk2:
        with Locations(Location((0, -75.5, 0), (0, 0, 90))):
            Circle(SKETCH28_R)
    cut_extrude15_tool2 = extrude(cut_extrude15_sk2.sketch, amount=-CUT_EXTRUDE15_REACH, mode=Mode.PRIVATE) & part.part
    add(cut_extrude15_tool1.solids().sort_by_distance((0, 28.5, -46.5))[0], mode=Mode.SUBTRACT)
    add(cut_extrude15_tool2.solids().sort_by_distance((0, 28.5, -75.5))[0], mode=Mode.SUBTRACT)

    # Fillet4
    fillet4_edges = [part.edges().sort_by_distance(p)[0] for p in [
        (35, 19, -2.5),
        (35, 20, -4),
        (35, 21, -2.5),
        (35, 11, -2.5),
        (35, 9, -2.5),
        (35, 10, -4),
        (-35, 19, -2.5),
        (-35, 20, -4),
        (-35, 21, -2.5),
        (-35, 11, -2.5),
        (-35, 9, -2.5),
        (-35, 10, -4),
    ]]
    fillet(fillet4_edges, radius=FILLET4_R)

    # Sketch29 → Cut-Extrude16 (cut, up to next)
    with BuildSketch(Plane(origin=(2.5, 0, 0), x_dir=(0, 0, -1), z_dir=(1, 0, 0)), mode=Mode.PRIVATE) as cut_extrude16_sk1:
        with Locations(Location((-2.5, 15, 0), (0, 0, 90))):
            Circle(SKETCH29_R)
    cut_extrude16_tool1 = extrude(cut_extrude16_sk1.sketch, amount=-CUT_EXTRUDE16_REACH, mode=Mode.PRIVATE) & part.part
    add(cut_extrude16_tool1.solids().sort_by_distance((2.5, 15, 2.5))[0], mode=Mode.SUBTRACT)

    # Sketch30 → Boss-Extrude9 (add)
    with BuildSketch(Plane.ZY.offset(2.5)):
        with Locations((2.5, 25.25)):
            Rectangle(SKETCH30_W, SKETCH30_H)
    boss_extrude9 = extrude(amount=BOSS_EXTRUDE9_DEPTH)

    # Sketch31 → Boss-Extrude10 (add)
    with BuildSketch(Plane.XZ.offset(-23.5)):
        with Locations((-7.95, 2.5)):
            Rectangle(SKETCH31_W, SKETCH31_H)
    boss_extrude10 = extrude(amount=BOSS_EXTRUDE10_DEPTH)

    # Sketch32 → Cut-Extrude17 (cut, up to next)
    with BuildSketch(Plane.ZY.offset(8.6), mode=Mode.PRIVATE) as cut_extrude17_sk1:
        with BuildLine():
            Line((-0.5, 18.5), (-0.5, 21.32455532))
            ThreePointArc((-0.5, 21.32455532), (2.5, 22), (5.5, 21.32455532))
            Line((5.5, 21.32455532), (5.5, 18.5))
            Line((5.5, 18.5), (-0.5, 18.5))
        make_face()
    cut_extrude17_tool1 = extrude(cut_extrude17_sk1.sketch, amount=-CUT_EXTRUDE17_REACH, mode=Mode.PRIVATE) & part.part
    cut_extrude17 = cut_extrude17_tool1.solids().sort_by_distance((-8.6, 20.145783, 2.5))[0]
    add(cut_extrude17, mode=Mode.SUBTRACT)

    # Mirror4: Boss-Extrude9, Boss-Extrude10, Cut-Extrude17 across plane
    add(boss_extrude9.mirror(Plane(origin=(0, 15, 0), x_dir=(0, 0, 1), z_dir=(0, -1, 0))))
    add(boss_extrude10.mirror(Plane(origin=(0, 15, 0), x_dir=(0, 0, 1), z_dir=(0, -1, 0))))
    add(cut_extrude17.mirror(Plane(origin=(0, 15, 0), x_dir=(0, 0, 1), z_dir=(0, -1, 0))), mode=Mode.SUBTRACT)

    # Mirror5: Boss-Extrude9, Boss-Extrude10, Cut-Extrude17 across plane
    add(boss_extrude9.mirror(Plane(origin=(0, 0, 0), x_dir=(0, 0, 1), z_dir=(1, 0, 0))))
    add(boss_extrude10.mirror(Plane(origin=(0, 0, 0), x_dir=(0, 0, 1), z_dir=(1, 0, 0))))
    add(cut_extrude17.mirror(Plane(origin=(0, 0, 0), x_dir=(0, 0, 1), z_dir=(1, 0, 0))), mode=Mode.SUBTRACT)

    # Mirror5 copy 1 sketch → Mirror5 copy 1 (add)
    with BuildSketch(Plane(origin=(2.5, 30, 0), x_dir=(0, 0, 1), z_dir=(1, 0, 0))):
        with Locations((2.5, 25.25)):
            Rectangle(MIRROR5_COPY_1_SKETCH_W, MIRROR5_COPY_1_SKETCH_H)
    extrude(amount=MIRROR5_COPY_1_DEPTH)

    # Mirror5 copy 2 sketch → Mirror5 copy 2 (add)
    with BuildSketch(Plane(origin=(0, 6.5, 0), x_dir=(-1, 0, 0), z_dir=(0, 1, 0))):
        with Locations((-7.95, 2.5)):
            Rectangle(MIRROR5_COPY_2_SKETCH_W, MIRROR5_COPY_2_SKETCH_H)
    extrude(amount=MIRROR5_COPY_2_DEPTH)

    # Mirror5 copy 3 sketch → Mirror5 copy 3 (cut, up to next)
    with BuildSketch(Plane(origin=(8.6, 30, 0), x_dir=(0, 0, 1), z_dir=(1, 0, 0)), mode=Mode.PRIVATE) as mirror5_copy_3_sk1:
        with BuildLine():
            Line((-0.5, 18.5), (-0.5, 21.32455532))
            ThreePointArc((-0.5, 21.32455532), (2.5, 22), (5.5, 21.32455532))
            Line((5.5, 21.32455532), (5.5, 18.5))
            Line((5.5, 18.5), (-0.5, 18.5))
        make_face()
    mirror5_copy_3_tool1 = extrude(mirror5_copy_3_sk1.sketch, amount=-MIRROR5_COPY_3_REACH, mode=Mode.PRIVATE) & part.part
    add(mirror5_copy_3_tool1.solids().sort_by_distance((8.6, 9.854217, 2.5))[0], mode=Mode.SUBTRACT)

    # Sketch33 → Loft4 section 0
    with BuildSketch(Plane.XY.offset(5.5)):
        with BuildLine():
            Line((-8.6, 30), (8.6, 30))
            Line((8.6, 30), (8.6, 27))
            Line((8.6, 27), (-8.6, 27))
            Line((-8.6, 27), (-8.6, 30))
        make_face()
    # Sketch34 → Loft4 section 1
    with BuildSketch(Plane(origin=(0, 0, 17.5), x_dir=(-1, 0, 0), z_dir=(0, 0, -1))):
        with BuildLine():
            Line((-8.6, 30), (8.6, 30))
            Line((8.6, 30), (8.6, 27))
            Line((8.6, 27), (-8.6, 27))
            Line((-8.6, 27), (-8.6, 30))
        make_face()
    loft4 = loft()

    # Mirror6: Loft4 across plane
    add(loft4.mirror(Plane(origin=(0, 15, 0), x_dir=(0, 0, 1), z_dir=(0, -1, 0))))

    # Sketch36 → Cut-Extrude19 (cut)
    with BuildSketch(Plane.XZ):
        with Locations((-2.588647032, -14.890240884)):
            Rectangle(SKETCH36_W, SKETCH36_H)
    extrude(amount=-CUT_EXTRUDE19_DEPTH, mode=Mode.SUBTRACT)

    # Sketch37 → Cut-Extrude20 (cut)
    with BuildSketch(Plane.XZ.offset(-12)):
        with Locations((9.01716818, -22.362478076)):
            Rectangle(SKETCH37_W, SKETCH37_H)
        with Locations((0.398006196, 35.5)):
            Rectangle(SKETCH37_W_2, SKETCH37_H_2, mode=Mode.SUBTRACT)
    extrude(amount=-CUT_EXTRUDE20_DEPTH, mode=Mode.SUBTRACT)

    # Sketch38 → Cut-Extrude21 (cut)
    with BuildSketch(Plane.XZ.offset(-15.5)):
        with Locations((0, -54.568485188)):
            Rectangle(SKETCH38_W, SKETCH38_H)
        with Locations((0, 2.5)):
            Rectangle(SKETCH38_W_2, SKETCH38_H_2)
    extrude(amount=-CUT_EXTRUDE21_DEPTH, mode=Mode.SUBTRACT)

    # Sketch39 → Cut-Extrude22 (cut)
    with BuildSketch(Plane.XZ.offset(-18)):
        with Locations((0, 2.5)):
            Rectangle(SKETCH39_W, SKETCH39_H)
    extrude(amount=-CUT_EXTRUDE22_DEPTH, mode=Mode.SUBTRACT)


solid = part.part
